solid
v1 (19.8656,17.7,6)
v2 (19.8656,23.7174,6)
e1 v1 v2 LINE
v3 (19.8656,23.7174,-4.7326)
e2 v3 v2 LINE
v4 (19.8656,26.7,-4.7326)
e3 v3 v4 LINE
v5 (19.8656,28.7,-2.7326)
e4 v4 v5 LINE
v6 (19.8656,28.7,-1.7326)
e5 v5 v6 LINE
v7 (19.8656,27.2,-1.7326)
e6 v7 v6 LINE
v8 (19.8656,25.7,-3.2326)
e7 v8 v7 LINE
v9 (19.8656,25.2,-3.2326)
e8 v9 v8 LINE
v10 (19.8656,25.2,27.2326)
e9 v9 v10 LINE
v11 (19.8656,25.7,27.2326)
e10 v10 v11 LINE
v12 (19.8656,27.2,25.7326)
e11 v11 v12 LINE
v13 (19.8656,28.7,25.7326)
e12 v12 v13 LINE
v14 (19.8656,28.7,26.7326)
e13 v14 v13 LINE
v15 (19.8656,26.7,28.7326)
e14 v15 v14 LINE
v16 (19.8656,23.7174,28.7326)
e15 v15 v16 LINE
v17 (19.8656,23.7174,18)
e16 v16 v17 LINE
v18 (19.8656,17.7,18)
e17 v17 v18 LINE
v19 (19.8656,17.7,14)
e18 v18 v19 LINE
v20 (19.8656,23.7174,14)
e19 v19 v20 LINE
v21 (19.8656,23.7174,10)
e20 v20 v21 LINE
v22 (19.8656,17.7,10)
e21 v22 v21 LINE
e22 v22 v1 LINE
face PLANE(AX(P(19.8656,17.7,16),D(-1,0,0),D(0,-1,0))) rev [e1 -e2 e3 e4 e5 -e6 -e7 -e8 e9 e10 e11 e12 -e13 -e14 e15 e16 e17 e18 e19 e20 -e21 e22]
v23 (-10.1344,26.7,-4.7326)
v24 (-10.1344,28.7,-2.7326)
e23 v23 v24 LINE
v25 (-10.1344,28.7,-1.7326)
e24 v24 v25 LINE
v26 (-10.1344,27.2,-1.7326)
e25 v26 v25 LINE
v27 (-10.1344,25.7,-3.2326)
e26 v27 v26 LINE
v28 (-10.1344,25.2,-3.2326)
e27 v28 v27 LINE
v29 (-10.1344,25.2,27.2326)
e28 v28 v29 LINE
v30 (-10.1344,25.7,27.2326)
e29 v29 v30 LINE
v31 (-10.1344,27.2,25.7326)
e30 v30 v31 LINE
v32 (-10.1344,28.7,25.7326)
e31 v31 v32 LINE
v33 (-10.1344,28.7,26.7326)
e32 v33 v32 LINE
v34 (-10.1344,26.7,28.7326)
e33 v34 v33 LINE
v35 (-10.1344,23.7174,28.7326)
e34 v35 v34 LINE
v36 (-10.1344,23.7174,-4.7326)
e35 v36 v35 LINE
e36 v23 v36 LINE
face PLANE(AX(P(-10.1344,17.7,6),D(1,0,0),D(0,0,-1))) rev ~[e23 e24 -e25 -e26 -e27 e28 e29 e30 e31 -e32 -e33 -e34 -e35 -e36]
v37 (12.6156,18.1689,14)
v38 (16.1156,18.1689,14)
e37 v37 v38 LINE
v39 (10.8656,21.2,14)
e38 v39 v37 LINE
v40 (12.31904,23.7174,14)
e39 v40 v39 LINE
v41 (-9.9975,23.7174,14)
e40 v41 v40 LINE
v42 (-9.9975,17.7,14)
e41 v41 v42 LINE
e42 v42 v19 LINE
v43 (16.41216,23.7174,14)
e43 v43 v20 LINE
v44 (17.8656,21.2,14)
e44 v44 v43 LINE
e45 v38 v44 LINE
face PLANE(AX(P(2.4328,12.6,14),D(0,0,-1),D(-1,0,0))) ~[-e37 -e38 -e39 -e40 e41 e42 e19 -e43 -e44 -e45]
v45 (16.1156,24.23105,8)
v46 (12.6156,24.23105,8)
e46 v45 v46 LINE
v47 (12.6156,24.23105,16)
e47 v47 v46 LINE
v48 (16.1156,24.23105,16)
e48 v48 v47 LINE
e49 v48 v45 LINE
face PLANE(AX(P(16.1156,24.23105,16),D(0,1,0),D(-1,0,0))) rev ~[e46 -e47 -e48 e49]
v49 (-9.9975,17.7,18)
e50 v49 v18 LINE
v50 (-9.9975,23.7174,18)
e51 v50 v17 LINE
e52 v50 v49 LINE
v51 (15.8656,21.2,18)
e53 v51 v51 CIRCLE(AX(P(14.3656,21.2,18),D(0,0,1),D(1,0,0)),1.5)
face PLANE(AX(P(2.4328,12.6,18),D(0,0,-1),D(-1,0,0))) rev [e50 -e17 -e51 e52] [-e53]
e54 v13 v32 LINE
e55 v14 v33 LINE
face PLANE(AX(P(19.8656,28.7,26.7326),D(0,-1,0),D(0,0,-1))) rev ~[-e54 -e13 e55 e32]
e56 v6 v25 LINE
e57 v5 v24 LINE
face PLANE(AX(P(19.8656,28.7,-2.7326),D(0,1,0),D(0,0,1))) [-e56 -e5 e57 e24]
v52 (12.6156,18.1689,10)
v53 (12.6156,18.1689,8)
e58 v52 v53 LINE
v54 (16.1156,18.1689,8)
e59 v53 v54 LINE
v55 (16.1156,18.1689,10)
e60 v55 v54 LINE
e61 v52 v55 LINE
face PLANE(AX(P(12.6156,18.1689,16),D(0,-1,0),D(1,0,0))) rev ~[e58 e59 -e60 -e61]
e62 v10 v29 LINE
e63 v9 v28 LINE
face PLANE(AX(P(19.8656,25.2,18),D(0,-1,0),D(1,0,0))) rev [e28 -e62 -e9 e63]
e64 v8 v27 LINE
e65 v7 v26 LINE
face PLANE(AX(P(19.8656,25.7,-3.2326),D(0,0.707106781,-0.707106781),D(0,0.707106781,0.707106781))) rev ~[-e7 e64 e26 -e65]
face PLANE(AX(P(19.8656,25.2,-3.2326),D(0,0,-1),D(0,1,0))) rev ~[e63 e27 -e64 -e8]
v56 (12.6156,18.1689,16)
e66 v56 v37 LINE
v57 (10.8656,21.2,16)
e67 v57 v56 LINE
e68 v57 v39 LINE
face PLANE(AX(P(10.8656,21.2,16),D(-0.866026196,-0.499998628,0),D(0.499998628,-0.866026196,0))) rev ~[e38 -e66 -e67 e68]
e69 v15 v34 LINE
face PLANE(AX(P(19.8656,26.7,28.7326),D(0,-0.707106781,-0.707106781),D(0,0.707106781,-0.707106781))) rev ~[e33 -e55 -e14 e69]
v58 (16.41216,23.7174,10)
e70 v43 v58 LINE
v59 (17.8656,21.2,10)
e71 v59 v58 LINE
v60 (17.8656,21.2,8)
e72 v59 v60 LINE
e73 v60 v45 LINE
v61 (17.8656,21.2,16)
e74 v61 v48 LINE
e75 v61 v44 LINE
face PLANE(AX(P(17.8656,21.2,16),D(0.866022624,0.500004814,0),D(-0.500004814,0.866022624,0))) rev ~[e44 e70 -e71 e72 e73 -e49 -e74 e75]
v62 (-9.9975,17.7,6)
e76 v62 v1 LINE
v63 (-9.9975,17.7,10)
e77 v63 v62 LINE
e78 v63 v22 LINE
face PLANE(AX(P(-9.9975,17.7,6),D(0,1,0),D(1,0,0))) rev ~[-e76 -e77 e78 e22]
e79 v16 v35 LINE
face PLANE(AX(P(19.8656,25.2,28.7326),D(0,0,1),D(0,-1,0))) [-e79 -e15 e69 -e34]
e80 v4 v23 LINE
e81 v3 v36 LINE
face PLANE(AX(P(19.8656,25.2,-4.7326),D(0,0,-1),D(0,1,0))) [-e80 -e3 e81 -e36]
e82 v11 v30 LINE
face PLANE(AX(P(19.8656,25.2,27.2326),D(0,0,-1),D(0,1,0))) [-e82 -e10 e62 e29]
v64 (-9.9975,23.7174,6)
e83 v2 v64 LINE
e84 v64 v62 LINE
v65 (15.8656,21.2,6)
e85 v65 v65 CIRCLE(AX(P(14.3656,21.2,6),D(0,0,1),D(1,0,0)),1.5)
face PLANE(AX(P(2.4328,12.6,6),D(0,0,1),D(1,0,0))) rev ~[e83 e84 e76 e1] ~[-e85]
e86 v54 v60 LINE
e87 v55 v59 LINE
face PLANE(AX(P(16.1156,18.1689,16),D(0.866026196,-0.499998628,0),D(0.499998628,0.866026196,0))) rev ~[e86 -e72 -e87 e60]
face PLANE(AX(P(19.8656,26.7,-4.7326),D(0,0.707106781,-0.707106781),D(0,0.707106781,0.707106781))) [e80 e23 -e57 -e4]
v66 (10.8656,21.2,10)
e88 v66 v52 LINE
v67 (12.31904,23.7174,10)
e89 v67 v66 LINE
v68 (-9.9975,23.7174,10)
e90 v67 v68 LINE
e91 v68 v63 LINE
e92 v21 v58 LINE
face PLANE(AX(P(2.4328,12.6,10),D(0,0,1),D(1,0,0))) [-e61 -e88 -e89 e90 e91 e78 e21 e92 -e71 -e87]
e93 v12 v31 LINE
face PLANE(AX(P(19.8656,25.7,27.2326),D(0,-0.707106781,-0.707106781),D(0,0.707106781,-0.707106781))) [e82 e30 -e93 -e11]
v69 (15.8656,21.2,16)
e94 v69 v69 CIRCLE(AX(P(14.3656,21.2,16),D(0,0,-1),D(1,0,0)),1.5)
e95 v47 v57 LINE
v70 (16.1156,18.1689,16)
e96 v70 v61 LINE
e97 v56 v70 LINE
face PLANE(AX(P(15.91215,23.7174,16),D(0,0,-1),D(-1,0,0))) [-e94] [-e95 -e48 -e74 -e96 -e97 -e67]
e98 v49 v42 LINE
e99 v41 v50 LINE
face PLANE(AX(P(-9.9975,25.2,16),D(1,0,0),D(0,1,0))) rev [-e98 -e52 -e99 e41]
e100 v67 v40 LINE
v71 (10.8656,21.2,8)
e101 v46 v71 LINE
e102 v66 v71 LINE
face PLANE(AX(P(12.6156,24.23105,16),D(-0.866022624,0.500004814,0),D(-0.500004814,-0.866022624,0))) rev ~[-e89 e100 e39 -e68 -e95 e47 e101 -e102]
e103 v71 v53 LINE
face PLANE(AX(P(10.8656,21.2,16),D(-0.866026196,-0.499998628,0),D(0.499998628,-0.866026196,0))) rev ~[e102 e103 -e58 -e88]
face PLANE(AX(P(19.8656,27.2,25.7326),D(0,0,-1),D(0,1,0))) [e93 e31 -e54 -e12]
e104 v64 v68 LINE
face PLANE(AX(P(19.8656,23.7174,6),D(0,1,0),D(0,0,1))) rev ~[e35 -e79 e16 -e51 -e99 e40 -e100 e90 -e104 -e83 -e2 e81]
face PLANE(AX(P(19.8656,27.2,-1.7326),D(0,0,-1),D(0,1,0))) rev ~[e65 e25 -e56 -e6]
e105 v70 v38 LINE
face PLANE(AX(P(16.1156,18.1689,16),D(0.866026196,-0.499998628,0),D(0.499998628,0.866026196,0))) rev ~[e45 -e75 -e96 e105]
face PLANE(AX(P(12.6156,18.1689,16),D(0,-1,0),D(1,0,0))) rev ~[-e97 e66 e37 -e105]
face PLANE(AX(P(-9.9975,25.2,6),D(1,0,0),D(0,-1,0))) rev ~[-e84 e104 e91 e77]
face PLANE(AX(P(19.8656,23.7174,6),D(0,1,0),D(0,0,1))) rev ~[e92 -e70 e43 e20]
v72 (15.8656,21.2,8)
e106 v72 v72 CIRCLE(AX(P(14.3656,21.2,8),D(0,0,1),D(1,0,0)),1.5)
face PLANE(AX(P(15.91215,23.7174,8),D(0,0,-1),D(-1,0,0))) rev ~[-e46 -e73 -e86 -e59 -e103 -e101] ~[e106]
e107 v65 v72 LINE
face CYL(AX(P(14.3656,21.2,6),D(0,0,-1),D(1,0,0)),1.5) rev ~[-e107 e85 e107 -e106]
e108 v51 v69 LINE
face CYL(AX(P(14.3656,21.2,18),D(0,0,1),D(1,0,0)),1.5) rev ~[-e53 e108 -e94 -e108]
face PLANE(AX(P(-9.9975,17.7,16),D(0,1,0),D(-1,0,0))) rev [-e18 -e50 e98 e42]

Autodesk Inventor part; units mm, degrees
ref_plane "YZ Plane" through (0, 0, 0) normal (1, 0, 0) x (0, 1, 0)
ref_plane "XZ Plane" through (0, 0, 0) normal (0, 1, 0) x (-1, 0, 0)
sketch "Sketch1" plane through (0, 0, 0) normal (0, 0, 1) x (1, 0, 0)
  circle A0 centre (23.8656, 17.2) radius 3 projected
  line L0 (34.8656, 12.9938) -> (34.8656, 22.2) projected
  line L1 (165.9417, 25.2) -> (-24.8583, 25.2) projected
  line L2 (34.8656, 25.2) -> (-24.8606, 25.2)
  line L3 (-24.8606, 25.2) -> (-24.8606, 10.2)
  line L4 (-24.8606, 10.2) -> (34.8656, 10.2)
  line L5 (34.8656, 10.2) -> (34.8656, 25.2)
  point P0 (0, 0)
  dimension "d0" = 15
extrude "Extrusion1" add sketch "Sketch1" along normal blind 4
sketch "Sketch2" plane through (0, 0, 4) normal (0, 0, 1) x (1, 0, 0)
  circle A0 centre (23.8656, 17.2) radius 3 projected
  line L0 (17.8656, 17.2) -> (20.8656, 22.3962)
  line L1 (20.8656, 22.3962) -> (26.8656, 22.3962)
  line L2 (26.8656, 22.3962) -> (29.8656, 17.2)
  line L3 (29.8656, 17.2) -> (26.8656, 12.0038)
  line L4 (26.8656, 12.0038) -> (20.8656, 12.0038)
  line L5 (20.8656, 12.0038) -> (17.8656, 17.2)
  circle A1 centre (23.8656, 17.2) radius 3 projected
  line L6 (34.8656, 25.2) -> (-24.8606, 25.2) projected
  line L7 (-24.8606, 25.2) -> (-24.8606, 10.2) projected
  line L8 (-24.8606, 10.2) -> (34.8656, 10.2) projected
  line L9 (34.8656, 10.2) -> (34.8656, 25.2) projected
  point P0 (0, 0)
extrude "Extrusion2" add sketch "Sketch2" along normal blind 4 contours L9 L8 L7 L6
sketch "Sketch4" plane through (34.8656, 10.2, 8) normal (1, 0, 0) x (0, 0, -1)
  line L0 (8, 0.0155) -> (-4, 0.0155)
  point P0 (8, -10.2)
  dimension "d8" = 12
sketch "Sketch6" plane through (0, 0, 4) normal (0, 0, 1) x (1, 0, 0)
  line L0 (20.8656, 22.3962) -> (17.8656, 17.2) projected
  line L1 (17.8656, 17.2) -> (20.8656, 12.0038) projected
  line L2 (20.8656, 12.0038) -> (26.8656, 12.0038) projected
  line L3 (26.8656, 12.0038) -> (29.8656, 17.2) projected
  line L4 (29.8656, 17.2) -> (26.8656, 22.3962) projected
  circle A0 centre (23.8656, 17.2) radius 3 projected
  line L5 (26.8656, 22.3962) -> (20.8656, 22.3962) projected
  point P0 (0, 0)
extrude "Extrusion4" cut sketch "Sketch6" along normal blind 16
sketch "Sketch7" plane through (0, 0, 4) normal (0, 0, 1) x (1, 0, 0)
  circle A0 centre (23.8656, 17.2) radius 3 projected
  line L0 (17.8656, 17.2) -> (20.8656, 12.0038) projected
  line L1 (17.8656, 17.2) -> (20.8656, 22.3962)
  line L2 (20.8656, 22.3962) -> (26.8656, 22.3962)
  line L3 (26.8656, 22.3962) -> (29.8656, 17.2)
  line L4 (29.8656, 17.2) -> (26.8656, 12.0038)
  line L5 (26.8656, 12.0038) -> (20.8656, 12.0038)
  line L6 (20.8656, 12.0038) -> (17.8656, 17.2)
  point P0 (0, 0)
extrude "Extrusion5" cut sketch "Sketch7" along normal blind 16
sketch "Sketch8" plane through (34.8656, 10.2, 0) normal (1, 0, 0) x (0, 0, -1)
  line L0 (-41.5, 15) -> (17.4652, 15) projected
  line L1 (17.4652, 16) -> (17.4652, 15) construction
  line L2 (15.4652, 18) -> (17.4652, 16) construction
  line L3 (14.5, 18) -> (15.4652, 18) construction
  line L4 (14.5, 18) -> (14.5, 63) construction
  arc A0 (14.5, 63) -> (12.5, 65) centre (12.5, 63) ccw construction
  line L5 (12.5, 65) -> (7.5, 65) construction
  line L6 (7.5, 65) -> (10.5, 62) construction
  line L7 (10.5, 62) -> (10.5, 20) construction
  arc A1 (8.5, 18) -> (10.5, 20) centre (8.5, 20) ccw construction
  line L8 (8.5, 18) -> (-32.5, 18) construction
  arc A2 (-34.5, 20) -> (-32.5, 18) centre (-32.5, 20) ccw construction
  line L9 (-34.5, 20) -> (-34.5, 62) construction
  line L10 (-34.5, 62) -> (-31.5, 65) construction
  line L11 (-31.5, 65) -> (-36.5, 65) construction
  arc A3 (-36.5, 65) -> (-38.5, 63) centre (-36.5, 63) ccw construction
  line L12 (-38.5, 63) -> (-38.5, 18) construction
  line L13 (-38.5, 18) -> (-39.5, 18) construction
  line L14 (-39.5, 18) -> (-41.5, 16) construction
  line L15 (-41.5, 16) -> (-41.5, 15) construction
  line L16 (0, 15) -> (17.4652, 15)
  line L17 (17.4652, 15) -> (18.4652, 15)
  line L18 (18.4652, 15) -> (18.4652, 16)
  line L19 (18.4652, 16) -> (15.4652, 19)
  line L20 (21.4652, 15) -> (21.4652, 18)
  line L21 (17.4652, 22) -> (15.4652, 22)
  line L22 (21.4652, 15) -> (21.4652, 12.0348)
  line L23 (21.4652, 12.0348) -> (0, 12.0348)
  line L24 (21.4652, 18) -> (17.4652, 22)
  line L25 (0, 0) -> (0, 15) construction
  line L26 (-32.6881, 12) -> (-32.6881, -32.4) projected
  line L27 (0, 12.0348) -> (-12, 12.0348)
  line L28 (-12, 15) -> (0, 15)
  arc A4 (-34.5, 20) -> (-32.5, 18) centre (-32.5, 20) ccw construction
  line L29 (-24, 15) -> (-41.4652, 15)
  line L30 (-41.4652, 15) -> (-42.4652, 15)
  line L31 (-42.4652, 15) -> (-42.4652, 16)
  line L32 (-42.4652, 16) -> (-39.4652, 19)
  line L33 (-45.4652, 15) -> (-45.4652, 18)
  line L34 (-41.4652, 22) -> (-39.4652, 22)
  line L35 (-45.4652, 15) -> (-45.4652, 12.0348)
  line L36 (-45.4652, 12.0348) -> (-24, 12.0348)
  line L37 (-45.4652, 18) -> (-41.4652, 22)
  line L38 (-24, 12.0348) -> (-12, 12.0348)
  line L39 (-12, 15) -> (-24, 15)
  line L40 (18.4652, 15) -> (-42.4652, 15)
  line L41 (21.4652, 12.0348) -> (-45.4652, 12.0348)
  line L42 (-45.4652, 12.0348) -> (-45.4652, 18)
  line L43 (-45.4652, 18) -> (-41.4652, 22)
  line L44 (-41.4652, 22) -> (-39.4652, 22)
  line L45 (-39.4652, 19) -> (-42.4652, 16)
  line L46 (-42.4652, 16) -> (-42.4652, 15)
  line L47 (-42.4652, 15) -> (18.4652, 15)
  line L48 (15.4652, 19) -> (15.4652, 22)
  line L49 (-39.4652, 19) -> (-39.4652, 22)
  point P0 (0, -10.2)
  point P1 (21.4652, 22)
  point P2 (-45.4652, 22)
  dimension "d16" = 3
  dimension "d17" = 4
  dimension "d18" = 4
extrude "Extrusion6" add sketch "Sketch8" against normal blind 60
sketch "Sketch9" plane through (34.8656, 22.2348, 8) normal (0, -1, 0) x (1, 0, 0)
  line L0 (0, -8) -> (0, -29.4652) projected
  line L1 (-60, -29.4652) -> (-60, 37.4652) projected
  line L2 (0, -8) -> (-60, -8)
  line L3 (-60, -8) -> (-60, 16)
  line L4 (-60, 16) -> (0, 16)
  line L5 (0, 16) -> (0, -8)
  line L6 (-60, 4) -> (0, 4)
  point P0 (-34.8656, -8)
  dimension "d21" = 24
ref_plane "Work Plane3" through (-25.1344, 22.2348, 12) normal (0, 0, -1) x (1, 0, 0)
mirror "Mirror2" about plane through (-25.1344, 22.2348, 12) normal (0, 0, -1) of "Extrusion1", "Extrusion2"
sketch "Sketch11" plane through (26.9587, 22.2348, 20) normal (0, 0, -1) x (-1, 0, 0)
  circle A0 centre (3.0931, -5.0348) radius 3 projected
  circle A1 centre (3.0931, -5.0348) radius 7
  circle A2 centre (3.0931, -5.0348) radius 3 projected
  line L0 (-3.9069, -5.0348) -> (-0.4069, 1.0273)
  line L1 (-0.4069, 1.0273) -> (6.5931, 1.0273)
  line L2 (6.5931, 1.0273) -> (10.0931, -5.0348)
  line L3 (10.0931, -5.0348) -> (6.5931, -11.097)
  line L4 (6.5931, -11.097) -> (-0.4069, -11.097)
  line L5 (-0.4069, -11.097) -> (-3.9069, -5.0348)
  point P0 (26.9587, -22.2348)
  dimension "d25" = 14
extrude "Extrusion8" cut sketch "Sketch11" along normal blind 16 contours L3 L4 L5 L0 L1 L2
scale "Scale1" factors (0.5, 0.5, 0.5) then translate (2.4328, 12.6, 6) bodies 1
equation "\"d18\" = d17"
properties part number "TopToBatteryJoint"
